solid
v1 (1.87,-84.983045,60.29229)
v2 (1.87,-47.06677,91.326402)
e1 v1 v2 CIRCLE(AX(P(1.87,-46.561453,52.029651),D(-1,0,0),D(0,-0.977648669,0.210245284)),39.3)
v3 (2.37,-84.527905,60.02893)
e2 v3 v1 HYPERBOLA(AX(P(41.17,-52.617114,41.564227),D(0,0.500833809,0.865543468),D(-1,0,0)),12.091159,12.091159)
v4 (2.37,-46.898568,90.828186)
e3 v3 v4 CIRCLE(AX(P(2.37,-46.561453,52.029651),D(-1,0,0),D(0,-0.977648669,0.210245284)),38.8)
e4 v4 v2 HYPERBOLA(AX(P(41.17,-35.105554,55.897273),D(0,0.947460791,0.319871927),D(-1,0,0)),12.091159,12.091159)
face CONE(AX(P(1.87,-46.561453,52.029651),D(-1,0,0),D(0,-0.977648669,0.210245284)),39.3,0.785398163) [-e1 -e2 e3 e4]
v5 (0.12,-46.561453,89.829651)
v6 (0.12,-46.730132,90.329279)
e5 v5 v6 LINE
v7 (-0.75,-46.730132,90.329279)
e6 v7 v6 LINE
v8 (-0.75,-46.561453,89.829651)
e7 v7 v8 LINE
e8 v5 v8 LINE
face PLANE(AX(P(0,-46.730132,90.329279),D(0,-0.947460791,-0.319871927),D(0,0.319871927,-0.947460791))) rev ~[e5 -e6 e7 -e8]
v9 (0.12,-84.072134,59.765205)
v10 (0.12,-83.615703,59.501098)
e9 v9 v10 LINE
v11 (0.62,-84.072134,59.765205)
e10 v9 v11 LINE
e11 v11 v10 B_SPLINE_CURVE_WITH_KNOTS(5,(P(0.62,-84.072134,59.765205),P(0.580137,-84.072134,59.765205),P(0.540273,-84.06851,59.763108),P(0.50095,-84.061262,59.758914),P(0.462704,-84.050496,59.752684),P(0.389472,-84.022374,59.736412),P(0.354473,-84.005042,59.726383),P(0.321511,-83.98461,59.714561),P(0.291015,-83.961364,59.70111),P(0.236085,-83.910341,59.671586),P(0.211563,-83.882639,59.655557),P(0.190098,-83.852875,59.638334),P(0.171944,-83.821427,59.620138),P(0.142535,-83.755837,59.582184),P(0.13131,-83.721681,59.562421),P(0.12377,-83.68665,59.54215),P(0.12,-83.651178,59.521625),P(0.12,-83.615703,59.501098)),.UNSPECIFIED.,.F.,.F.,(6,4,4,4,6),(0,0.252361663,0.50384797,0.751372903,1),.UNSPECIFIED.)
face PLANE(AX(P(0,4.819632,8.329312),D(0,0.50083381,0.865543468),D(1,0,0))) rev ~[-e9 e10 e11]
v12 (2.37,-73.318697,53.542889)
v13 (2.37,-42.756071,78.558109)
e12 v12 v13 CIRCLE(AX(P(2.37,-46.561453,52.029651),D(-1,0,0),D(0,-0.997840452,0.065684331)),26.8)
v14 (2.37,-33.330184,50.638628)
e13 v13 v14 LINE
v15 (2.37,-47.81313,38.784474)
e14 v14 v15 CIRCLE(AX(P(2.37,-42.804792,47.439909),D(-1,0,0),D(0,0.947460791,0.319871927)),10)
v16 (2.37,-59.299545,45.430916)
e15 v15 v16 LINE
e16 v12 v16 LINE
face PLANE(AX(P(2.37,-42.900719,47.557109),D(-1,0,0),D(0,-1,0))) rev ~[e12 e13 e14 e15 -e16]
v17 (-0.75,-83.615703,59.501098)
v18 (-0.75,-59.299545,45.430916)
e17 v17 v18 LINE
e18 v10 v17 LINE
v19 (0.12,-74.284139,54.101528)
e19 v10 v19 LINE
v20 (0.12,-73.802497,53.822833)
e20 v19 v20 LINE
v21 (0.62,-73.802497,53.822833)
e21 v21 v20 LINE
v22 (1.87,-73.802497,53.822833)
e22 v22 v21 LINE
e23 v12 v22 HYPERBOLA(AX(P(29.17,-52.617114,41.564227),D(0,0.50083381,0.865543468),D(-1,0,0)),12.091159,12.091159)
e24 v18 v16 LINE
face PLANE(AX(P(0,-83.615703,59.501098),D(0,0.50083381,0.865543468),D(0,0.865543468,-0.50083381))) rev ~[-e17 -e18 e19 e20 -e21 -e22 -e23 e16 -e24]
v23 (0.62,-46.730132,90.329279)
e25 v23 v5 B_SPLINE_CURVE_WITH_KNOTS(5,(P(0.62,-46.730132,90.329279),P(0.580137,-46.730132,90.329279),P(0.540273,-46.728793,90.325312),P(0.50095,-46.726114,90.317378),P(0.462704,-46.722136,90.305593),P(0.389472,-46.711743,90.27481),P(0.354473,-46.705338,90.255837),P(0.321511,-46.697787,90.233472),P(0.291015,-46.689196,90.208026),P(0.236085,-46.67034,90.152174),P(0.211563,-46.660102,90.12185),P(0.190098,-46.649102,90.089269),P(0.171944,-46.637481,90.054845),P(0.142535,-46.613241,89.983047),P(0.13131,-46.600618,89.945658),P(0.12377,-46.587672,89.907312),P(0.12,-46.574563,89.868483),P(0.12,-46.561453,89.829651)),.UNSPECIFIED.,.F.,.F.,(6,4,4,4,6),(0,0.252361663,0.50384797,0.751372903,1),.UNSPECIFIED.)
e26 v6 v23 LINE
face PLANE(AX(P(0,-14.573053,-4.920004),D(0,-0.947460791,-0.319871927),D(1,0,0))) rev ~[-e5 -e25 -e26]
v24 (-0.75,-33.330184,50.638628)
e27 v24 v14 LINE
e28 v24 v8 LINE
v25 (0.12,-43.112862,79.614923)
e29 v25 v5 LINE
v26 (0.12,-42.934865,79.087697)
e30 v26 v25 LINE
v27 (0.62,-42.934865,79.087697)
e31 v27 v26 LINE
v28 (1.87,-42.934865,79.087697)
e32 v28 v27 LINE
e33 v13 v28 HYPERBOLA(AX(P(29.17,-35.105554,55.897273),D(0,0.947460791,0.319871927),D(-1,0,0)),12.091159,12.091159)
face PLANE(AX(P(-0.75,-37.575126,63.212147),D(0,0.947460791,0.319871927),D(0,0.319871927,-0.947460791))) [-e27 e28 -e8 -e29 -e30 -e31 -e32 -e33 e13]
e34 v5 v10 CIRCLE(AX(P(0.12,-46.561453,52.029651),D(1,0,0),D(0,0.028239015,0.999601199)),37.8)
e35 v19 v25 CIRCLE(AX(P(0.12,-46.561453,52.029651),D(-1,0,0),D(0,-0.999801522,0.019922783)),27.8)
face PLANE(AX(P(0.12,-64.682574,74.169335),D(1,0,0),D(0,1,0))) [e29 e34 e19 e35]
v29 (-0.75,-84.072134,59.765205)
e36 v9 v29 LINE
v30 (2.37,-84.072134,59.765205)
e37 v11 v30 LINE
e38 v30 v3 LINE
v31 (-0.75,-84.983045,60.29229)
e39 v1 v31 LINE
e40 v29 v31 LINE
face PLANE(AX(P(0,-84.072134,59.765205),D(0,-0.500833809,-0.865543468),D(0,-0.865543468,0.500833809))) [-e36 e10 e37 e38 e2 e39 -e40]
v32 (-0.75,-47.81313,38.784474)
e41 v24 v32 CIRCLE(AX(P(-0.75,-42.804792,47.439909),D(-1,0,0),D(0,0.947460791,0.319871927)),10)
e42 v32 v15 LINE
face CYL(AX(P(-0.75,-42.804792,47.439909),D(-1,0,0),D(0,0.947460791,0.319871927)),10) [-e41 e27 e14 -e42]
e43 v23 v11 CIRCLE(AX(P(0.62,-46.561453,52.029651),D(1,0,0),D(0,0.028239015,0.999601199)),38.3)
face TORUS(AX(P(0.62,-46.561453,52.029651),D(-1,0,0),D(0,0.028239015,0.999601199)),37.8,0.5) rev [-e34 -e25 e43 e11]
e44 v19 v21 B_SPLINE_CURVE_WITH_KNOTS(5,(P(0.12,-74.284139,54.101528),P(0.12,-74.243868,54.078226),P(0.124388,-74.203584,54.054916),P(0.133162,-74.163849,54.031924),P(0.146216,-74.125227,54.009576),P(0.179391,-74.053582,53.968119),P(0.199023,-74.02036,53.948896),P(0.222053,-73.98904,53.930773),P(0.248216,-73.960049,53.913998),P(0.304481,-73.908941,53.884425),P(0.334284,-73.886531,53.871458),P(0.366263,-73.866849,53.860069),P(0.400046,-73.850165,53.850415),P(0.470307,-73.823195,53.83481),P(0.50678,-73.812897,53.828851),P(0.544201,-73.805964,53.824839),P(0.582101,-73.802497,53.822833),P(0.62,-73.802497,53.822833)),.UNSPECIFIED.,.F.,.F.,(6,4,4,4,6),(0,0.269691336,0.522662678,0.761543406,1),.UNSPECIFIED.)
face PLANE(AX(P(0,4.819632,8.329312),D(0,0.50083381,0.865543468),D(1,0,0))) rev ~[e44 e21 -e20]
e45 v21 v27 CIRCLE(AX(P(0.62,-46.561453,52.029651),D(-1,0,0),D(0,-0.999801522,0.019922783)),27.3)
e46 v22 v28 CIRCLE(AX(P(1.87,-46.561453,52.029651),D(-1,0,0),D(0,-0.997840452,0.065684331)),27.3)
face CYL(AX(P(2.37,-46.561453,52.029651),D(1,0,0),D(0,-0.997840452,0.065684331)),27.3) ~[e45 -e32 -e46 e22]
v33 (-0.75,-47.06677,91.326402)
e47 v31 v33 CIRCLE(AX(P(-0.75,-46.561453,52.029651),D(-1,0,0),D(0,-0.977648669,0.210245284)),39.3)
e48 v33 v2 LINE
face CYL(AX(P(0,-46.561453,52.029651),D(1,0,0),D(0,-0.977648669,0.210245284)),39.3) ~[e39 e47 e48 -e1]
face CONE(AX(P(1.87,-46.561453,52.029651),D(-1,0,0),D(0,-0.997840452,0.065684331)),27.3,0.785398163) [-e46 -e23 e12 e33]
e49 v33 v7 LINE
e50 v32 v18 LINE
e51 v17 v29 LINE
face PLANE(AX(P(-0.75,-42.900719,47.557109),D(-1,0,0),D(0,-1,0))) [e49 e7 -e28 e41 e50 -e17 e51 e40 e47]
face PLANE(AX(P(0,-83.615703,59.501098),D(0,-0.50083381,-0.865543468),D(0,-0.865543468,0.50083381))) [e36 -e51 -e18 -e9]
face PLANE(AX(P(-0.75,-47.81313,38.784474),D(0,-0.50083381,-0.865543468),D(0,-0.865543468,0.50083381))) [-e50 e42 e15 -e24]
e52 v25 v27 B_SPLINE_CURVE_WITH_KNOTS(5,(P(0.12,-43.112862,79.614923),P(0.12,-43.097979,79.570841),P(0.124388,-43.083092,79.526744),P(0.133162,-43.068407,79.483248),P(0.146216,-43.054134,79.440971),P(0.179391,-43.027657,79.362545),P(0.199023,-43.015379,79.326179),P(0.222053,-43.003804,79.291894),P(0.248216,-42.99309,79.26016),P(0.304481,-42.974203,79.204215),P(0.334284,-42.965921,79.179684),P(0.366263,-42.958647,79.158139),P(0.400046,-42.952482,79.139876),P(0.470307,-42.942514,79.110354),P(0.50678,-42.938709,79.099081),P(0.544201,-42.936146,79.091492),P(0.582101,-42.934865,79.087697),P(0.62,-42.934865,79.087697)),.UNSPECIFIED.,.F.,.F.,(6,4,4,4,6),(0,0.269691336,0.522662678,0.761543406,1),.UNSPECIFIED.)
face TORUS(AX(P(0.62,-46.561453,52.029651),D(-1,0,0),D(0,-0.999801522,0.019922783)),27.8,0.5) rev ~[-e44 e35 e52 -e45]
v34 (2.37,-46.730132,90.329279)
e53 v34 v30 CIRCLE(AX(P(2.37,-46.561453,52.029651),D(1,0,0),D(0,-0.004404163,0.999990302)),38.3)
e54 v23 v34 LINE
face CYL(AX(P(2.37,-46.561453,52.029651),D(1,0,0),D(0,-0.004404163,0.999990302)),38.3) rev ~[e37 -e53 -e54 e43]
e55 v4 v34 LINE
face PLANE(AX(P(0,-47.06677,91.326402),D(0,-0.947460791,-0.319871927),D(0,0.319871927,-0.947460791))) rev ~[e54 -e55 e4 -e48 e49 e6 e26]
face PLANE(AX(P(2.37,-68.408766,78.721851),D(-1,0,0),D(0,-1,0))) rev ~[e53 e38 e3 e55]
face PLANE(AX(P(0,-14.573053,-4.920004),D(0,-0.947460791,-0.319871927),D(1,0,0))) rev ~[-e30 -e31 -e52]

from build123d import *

# Parameters (mm, degrees)
F1_DEPTH     = 2.37
F3_DEPTH     = 2.37
F5_DEPTH     = 2.25
F6_DEPTH     = 0.75
F7_SIZE      = 0.5
F8_T4_ANGLE  = 81.836383008
F8_T10_ANGLE = 99.1168662244
F10_DEPTH    = 3.12


# Not quite as in the source:
# - a fillet or chamfer that OpenCascade refuses, or shapes differently, is made with other operations: its cross-section is extruded or revolved along the edge and cut away or added


with BuildPart() as f1:
    # F0 (on Right) → F1 (new body)
    with BuildSketch(Plane.YZ):
        with BuildLine():
            ThreePointArc((-46.5614527995, 89.8296507657), (-59.272592692, 87.6283434753), (-70.5032497848, 81.2808106933))
            Line((-70.5032497848, 81.2808106933), (-46.5614527995, 52.0296507657))
            Line((-46.5614527995, 52.0296507657), (-42.2863249385, 46.8064651858))
            ThreePointArc((-42.2863249385, 46.8064651858), (-37.3697308445, 54.2738686288), (-37.5751261635, 63.2121472344))
            Line((-37.5751261635, 63.2121472344), (-46.5614527995, 89.8296507657))
        make_face()
        with BuildLine():
            Line((-46.5614527995, 52.0296507657), (-70.5032497848, 81.2808106933))
            ThreePointArc((-70.5032497848, 81.2808106933), (-78.9453750126, 71.5263577209), (-83.6157032002, 59.501098232))
            Line((-83.6157032002, 59.501098232), (-59.2995451707, 45.4309163095))
            ThreePointArc((-59.2995451707, 45.4309163095), (-50.5782061954, 43.4628568222), (-42.2863249385, 46.8064651858))
            Line((-42.2863249385, 46.8064651858), (-46.5614527995, 52.0296507657))
        make_face()
    extrude(amount=F1_DEPTH)

    # F2 (on face) → F3 (join)
    with BuildSketch(Plane(origin=(0, 0, 0), x_dir=(0, -1, 0), z_dir=(-1, 0, 0))):
        with BuildLine():
            ThreePointArc((84.0721339402, 59.7652050675), (70.8199402211, 81.6677307982), (46.7301322311, 90.3292793181))
            Line((46.7301322311, 90.3292793181), (46.5614527995, 89.8296507657))
            ThreePointArc((46.5614527995, 89.8296507657), (70.5032497848, 81.2808106933), (83.6157032002, 59.501098232))
            Line((83.6157032002, 59.501098232), (84.0721339402, 59.7652050675))
        make_face()
        with BuildLine():
            ThreePointArc((84.9830454985, 60.2922904452), (71.4533210937, 82.4415710079), (47.0667704776, 91.3264019551))
            Line((47.0667704776, 91.3264019551), (46.7301322311, 90.3292793181))
            ThreePointArc((46.7301322311, 90.3292793181), (70.8199402211, 81.6677307982), (84.0721339402, 59.7652050675))
            Line((84.0721339402, 59.7652050675), (84.9830454985, 60.2922904452))
        make_face()
    extrude(amount=-F3_DEPTH)

    # F4 (on face) → F5 (cut)
    with BuildSketch(Plane.YZ.offset(2.37)):
        with BuildLine():
            ThreePointArc((-73.802497152, 53.8228330154), (-63.8527506222, 73.1554884912), (-42.9348652938, 79.0876969454))
            Line((-42.9348652938, 79.0876969454), (-46.7301322311, 90.3292793181))
            ThreePointArc((-46.7301322311, 90.3292793181), (-70.8199402211, 81.6677307982), (-84.0721339402, 59.7652050675))
            Line((-84.0721339402, 59.7652050675), (-73.802497152, 53.8228330154))
        make_face()
    extrude(amount=-F5_DEPTH, mode=Mode.SUBTRACT)

    # F6 (add): a face of the model
    f6_faces = [f1.faces().sort_by_distance(p)[0] for p in [
        (0, -58.3598378742, 66.4444605195),
    ]]
    extrude(f6_faces, amount=F6_DEPTH)

    # F7
    f7_edges = [f1.edges().sort_by_distance(p)[0] for p in [
        (2.37, -71.453321, 82.441571),
        (2.37, -63.852751, 73.155488),
    ]]
    chamfer(f7_edges, length=F7_SIZE)

    # F8: fillet of radius 0.5 on 2 edges, made by hand


with BuildPart() as f8_tool2:
    # F8_s3 → F8_t4 (revolve)
    with BuildSketch(Plane(origin=(0, -47.9930028953, 1.3558158365), x_dir=(1, 0, 0), z_dir=(0, 0.9996011995, -0.0282390152))):
        with BuildLine():
            ThreePointArc((0.62, -88.9940517429), (0.2664466094, -88.8476051335), (0.12, -88.4940517429))
            Line((0.12, -88.4940517429), (0.12, -88.9940517429))
            Line((0.12, -88.9940517429), (0.62, -88.9940517429))
        make_face()
    revolve(axis=Axis((0.12, -46.5614527995, 52.0296507657), (1, 0, 0)), revolution_arc=F8_T4_ANGLE)

    split(bisect_by=Plane(origin=(0, 4.8196318055, 8.3293115378), x_dir=(1, 0, 0), z_dir=(0, 0.5008338095, 0.8655434681)), keep=Keep.TOP)

    split(bisect_by=Plane(origin=(0, -14.5730530493, -4.9200036596), x_dir=(1, 0, 0), z_dir=(0, -0.947460791, -0.3198719268)), keep=Keep.TOP)


with BuildPart() as f1_1:
    add(f1.part)

    # F8_t1: union F8_tool2
    add(f8_tool2.part)


with BuildPart() as f8_tool8:
    # F8_s9 → F8_t10 (revolve)
    with BuildSketch(Plane(origin=(0, 1.0178886406, 51.0815497106), x_dir=(1, 0, 0), z_dir=(0, -0.0199227826, -0.9998015217))):
        with BuildLine():
            ThreePointArc((0.12, 75.388786783), (0.2664466094, 75.0352333924), (0.62, 74.888786783))
            Line((0.62, 74.888786783), (0.12, 74.888786783))
            Line((0.12, 74.888786783), (0.12, 75.388786783))
        make_face()
    revolve(axis=Axis((0.12, -46.5614527995, 52.0296507657), (-1, 0, 0)), revolution_arc=F8_T10_ANGLE)

    split(bisect_by=Plane(origin=(0, 4.8196318055, 8.3293115378), x_dir=(1, 0, 0), z_dir=(0, 0.5008338095, 0.8655434681)), keep=Keep.TOP)

    split(bisect_by=Plane(origin=(0, -14.5730530493, -4.9200036596), x_dir=(1, 0, 0), z_dir=(0, -0.947460791, -0.3198719268)), keep=Keep.TOP)


with BuildPart() as f1_2:
    add(f1_1.part)

    # F8_t7: union F8_tool8
    add(f8_tool8.part)

    # F9 (on face) → F10 (join)
    with BuildSketch(Plane(origin=(-0.75, 0, 0), x_dir=(0, -1, 0), z_dir=(-1, 0, 0))):
        with BuildLine():
            ThreePointArc((59.2995451707, 45.4309163095), (42.2863249385, 46.8064651858), (37.5751261635, 63.2121472344))
            Line((37.5751261635, 63.2121472344), (33.3301843859, 50.6386277829))
            ThreePointArc((33.3301843859, 50.6386277829), (36.4709835693, 39.7015064172), (47.8131303907, 38.784473833))
            Line((47.8131303907, 38.784473833), (59.2995451707, 45.4309163095))
        make_face()
    extrude(amount=-F10_DEPTH)


solid = f1_2.part
